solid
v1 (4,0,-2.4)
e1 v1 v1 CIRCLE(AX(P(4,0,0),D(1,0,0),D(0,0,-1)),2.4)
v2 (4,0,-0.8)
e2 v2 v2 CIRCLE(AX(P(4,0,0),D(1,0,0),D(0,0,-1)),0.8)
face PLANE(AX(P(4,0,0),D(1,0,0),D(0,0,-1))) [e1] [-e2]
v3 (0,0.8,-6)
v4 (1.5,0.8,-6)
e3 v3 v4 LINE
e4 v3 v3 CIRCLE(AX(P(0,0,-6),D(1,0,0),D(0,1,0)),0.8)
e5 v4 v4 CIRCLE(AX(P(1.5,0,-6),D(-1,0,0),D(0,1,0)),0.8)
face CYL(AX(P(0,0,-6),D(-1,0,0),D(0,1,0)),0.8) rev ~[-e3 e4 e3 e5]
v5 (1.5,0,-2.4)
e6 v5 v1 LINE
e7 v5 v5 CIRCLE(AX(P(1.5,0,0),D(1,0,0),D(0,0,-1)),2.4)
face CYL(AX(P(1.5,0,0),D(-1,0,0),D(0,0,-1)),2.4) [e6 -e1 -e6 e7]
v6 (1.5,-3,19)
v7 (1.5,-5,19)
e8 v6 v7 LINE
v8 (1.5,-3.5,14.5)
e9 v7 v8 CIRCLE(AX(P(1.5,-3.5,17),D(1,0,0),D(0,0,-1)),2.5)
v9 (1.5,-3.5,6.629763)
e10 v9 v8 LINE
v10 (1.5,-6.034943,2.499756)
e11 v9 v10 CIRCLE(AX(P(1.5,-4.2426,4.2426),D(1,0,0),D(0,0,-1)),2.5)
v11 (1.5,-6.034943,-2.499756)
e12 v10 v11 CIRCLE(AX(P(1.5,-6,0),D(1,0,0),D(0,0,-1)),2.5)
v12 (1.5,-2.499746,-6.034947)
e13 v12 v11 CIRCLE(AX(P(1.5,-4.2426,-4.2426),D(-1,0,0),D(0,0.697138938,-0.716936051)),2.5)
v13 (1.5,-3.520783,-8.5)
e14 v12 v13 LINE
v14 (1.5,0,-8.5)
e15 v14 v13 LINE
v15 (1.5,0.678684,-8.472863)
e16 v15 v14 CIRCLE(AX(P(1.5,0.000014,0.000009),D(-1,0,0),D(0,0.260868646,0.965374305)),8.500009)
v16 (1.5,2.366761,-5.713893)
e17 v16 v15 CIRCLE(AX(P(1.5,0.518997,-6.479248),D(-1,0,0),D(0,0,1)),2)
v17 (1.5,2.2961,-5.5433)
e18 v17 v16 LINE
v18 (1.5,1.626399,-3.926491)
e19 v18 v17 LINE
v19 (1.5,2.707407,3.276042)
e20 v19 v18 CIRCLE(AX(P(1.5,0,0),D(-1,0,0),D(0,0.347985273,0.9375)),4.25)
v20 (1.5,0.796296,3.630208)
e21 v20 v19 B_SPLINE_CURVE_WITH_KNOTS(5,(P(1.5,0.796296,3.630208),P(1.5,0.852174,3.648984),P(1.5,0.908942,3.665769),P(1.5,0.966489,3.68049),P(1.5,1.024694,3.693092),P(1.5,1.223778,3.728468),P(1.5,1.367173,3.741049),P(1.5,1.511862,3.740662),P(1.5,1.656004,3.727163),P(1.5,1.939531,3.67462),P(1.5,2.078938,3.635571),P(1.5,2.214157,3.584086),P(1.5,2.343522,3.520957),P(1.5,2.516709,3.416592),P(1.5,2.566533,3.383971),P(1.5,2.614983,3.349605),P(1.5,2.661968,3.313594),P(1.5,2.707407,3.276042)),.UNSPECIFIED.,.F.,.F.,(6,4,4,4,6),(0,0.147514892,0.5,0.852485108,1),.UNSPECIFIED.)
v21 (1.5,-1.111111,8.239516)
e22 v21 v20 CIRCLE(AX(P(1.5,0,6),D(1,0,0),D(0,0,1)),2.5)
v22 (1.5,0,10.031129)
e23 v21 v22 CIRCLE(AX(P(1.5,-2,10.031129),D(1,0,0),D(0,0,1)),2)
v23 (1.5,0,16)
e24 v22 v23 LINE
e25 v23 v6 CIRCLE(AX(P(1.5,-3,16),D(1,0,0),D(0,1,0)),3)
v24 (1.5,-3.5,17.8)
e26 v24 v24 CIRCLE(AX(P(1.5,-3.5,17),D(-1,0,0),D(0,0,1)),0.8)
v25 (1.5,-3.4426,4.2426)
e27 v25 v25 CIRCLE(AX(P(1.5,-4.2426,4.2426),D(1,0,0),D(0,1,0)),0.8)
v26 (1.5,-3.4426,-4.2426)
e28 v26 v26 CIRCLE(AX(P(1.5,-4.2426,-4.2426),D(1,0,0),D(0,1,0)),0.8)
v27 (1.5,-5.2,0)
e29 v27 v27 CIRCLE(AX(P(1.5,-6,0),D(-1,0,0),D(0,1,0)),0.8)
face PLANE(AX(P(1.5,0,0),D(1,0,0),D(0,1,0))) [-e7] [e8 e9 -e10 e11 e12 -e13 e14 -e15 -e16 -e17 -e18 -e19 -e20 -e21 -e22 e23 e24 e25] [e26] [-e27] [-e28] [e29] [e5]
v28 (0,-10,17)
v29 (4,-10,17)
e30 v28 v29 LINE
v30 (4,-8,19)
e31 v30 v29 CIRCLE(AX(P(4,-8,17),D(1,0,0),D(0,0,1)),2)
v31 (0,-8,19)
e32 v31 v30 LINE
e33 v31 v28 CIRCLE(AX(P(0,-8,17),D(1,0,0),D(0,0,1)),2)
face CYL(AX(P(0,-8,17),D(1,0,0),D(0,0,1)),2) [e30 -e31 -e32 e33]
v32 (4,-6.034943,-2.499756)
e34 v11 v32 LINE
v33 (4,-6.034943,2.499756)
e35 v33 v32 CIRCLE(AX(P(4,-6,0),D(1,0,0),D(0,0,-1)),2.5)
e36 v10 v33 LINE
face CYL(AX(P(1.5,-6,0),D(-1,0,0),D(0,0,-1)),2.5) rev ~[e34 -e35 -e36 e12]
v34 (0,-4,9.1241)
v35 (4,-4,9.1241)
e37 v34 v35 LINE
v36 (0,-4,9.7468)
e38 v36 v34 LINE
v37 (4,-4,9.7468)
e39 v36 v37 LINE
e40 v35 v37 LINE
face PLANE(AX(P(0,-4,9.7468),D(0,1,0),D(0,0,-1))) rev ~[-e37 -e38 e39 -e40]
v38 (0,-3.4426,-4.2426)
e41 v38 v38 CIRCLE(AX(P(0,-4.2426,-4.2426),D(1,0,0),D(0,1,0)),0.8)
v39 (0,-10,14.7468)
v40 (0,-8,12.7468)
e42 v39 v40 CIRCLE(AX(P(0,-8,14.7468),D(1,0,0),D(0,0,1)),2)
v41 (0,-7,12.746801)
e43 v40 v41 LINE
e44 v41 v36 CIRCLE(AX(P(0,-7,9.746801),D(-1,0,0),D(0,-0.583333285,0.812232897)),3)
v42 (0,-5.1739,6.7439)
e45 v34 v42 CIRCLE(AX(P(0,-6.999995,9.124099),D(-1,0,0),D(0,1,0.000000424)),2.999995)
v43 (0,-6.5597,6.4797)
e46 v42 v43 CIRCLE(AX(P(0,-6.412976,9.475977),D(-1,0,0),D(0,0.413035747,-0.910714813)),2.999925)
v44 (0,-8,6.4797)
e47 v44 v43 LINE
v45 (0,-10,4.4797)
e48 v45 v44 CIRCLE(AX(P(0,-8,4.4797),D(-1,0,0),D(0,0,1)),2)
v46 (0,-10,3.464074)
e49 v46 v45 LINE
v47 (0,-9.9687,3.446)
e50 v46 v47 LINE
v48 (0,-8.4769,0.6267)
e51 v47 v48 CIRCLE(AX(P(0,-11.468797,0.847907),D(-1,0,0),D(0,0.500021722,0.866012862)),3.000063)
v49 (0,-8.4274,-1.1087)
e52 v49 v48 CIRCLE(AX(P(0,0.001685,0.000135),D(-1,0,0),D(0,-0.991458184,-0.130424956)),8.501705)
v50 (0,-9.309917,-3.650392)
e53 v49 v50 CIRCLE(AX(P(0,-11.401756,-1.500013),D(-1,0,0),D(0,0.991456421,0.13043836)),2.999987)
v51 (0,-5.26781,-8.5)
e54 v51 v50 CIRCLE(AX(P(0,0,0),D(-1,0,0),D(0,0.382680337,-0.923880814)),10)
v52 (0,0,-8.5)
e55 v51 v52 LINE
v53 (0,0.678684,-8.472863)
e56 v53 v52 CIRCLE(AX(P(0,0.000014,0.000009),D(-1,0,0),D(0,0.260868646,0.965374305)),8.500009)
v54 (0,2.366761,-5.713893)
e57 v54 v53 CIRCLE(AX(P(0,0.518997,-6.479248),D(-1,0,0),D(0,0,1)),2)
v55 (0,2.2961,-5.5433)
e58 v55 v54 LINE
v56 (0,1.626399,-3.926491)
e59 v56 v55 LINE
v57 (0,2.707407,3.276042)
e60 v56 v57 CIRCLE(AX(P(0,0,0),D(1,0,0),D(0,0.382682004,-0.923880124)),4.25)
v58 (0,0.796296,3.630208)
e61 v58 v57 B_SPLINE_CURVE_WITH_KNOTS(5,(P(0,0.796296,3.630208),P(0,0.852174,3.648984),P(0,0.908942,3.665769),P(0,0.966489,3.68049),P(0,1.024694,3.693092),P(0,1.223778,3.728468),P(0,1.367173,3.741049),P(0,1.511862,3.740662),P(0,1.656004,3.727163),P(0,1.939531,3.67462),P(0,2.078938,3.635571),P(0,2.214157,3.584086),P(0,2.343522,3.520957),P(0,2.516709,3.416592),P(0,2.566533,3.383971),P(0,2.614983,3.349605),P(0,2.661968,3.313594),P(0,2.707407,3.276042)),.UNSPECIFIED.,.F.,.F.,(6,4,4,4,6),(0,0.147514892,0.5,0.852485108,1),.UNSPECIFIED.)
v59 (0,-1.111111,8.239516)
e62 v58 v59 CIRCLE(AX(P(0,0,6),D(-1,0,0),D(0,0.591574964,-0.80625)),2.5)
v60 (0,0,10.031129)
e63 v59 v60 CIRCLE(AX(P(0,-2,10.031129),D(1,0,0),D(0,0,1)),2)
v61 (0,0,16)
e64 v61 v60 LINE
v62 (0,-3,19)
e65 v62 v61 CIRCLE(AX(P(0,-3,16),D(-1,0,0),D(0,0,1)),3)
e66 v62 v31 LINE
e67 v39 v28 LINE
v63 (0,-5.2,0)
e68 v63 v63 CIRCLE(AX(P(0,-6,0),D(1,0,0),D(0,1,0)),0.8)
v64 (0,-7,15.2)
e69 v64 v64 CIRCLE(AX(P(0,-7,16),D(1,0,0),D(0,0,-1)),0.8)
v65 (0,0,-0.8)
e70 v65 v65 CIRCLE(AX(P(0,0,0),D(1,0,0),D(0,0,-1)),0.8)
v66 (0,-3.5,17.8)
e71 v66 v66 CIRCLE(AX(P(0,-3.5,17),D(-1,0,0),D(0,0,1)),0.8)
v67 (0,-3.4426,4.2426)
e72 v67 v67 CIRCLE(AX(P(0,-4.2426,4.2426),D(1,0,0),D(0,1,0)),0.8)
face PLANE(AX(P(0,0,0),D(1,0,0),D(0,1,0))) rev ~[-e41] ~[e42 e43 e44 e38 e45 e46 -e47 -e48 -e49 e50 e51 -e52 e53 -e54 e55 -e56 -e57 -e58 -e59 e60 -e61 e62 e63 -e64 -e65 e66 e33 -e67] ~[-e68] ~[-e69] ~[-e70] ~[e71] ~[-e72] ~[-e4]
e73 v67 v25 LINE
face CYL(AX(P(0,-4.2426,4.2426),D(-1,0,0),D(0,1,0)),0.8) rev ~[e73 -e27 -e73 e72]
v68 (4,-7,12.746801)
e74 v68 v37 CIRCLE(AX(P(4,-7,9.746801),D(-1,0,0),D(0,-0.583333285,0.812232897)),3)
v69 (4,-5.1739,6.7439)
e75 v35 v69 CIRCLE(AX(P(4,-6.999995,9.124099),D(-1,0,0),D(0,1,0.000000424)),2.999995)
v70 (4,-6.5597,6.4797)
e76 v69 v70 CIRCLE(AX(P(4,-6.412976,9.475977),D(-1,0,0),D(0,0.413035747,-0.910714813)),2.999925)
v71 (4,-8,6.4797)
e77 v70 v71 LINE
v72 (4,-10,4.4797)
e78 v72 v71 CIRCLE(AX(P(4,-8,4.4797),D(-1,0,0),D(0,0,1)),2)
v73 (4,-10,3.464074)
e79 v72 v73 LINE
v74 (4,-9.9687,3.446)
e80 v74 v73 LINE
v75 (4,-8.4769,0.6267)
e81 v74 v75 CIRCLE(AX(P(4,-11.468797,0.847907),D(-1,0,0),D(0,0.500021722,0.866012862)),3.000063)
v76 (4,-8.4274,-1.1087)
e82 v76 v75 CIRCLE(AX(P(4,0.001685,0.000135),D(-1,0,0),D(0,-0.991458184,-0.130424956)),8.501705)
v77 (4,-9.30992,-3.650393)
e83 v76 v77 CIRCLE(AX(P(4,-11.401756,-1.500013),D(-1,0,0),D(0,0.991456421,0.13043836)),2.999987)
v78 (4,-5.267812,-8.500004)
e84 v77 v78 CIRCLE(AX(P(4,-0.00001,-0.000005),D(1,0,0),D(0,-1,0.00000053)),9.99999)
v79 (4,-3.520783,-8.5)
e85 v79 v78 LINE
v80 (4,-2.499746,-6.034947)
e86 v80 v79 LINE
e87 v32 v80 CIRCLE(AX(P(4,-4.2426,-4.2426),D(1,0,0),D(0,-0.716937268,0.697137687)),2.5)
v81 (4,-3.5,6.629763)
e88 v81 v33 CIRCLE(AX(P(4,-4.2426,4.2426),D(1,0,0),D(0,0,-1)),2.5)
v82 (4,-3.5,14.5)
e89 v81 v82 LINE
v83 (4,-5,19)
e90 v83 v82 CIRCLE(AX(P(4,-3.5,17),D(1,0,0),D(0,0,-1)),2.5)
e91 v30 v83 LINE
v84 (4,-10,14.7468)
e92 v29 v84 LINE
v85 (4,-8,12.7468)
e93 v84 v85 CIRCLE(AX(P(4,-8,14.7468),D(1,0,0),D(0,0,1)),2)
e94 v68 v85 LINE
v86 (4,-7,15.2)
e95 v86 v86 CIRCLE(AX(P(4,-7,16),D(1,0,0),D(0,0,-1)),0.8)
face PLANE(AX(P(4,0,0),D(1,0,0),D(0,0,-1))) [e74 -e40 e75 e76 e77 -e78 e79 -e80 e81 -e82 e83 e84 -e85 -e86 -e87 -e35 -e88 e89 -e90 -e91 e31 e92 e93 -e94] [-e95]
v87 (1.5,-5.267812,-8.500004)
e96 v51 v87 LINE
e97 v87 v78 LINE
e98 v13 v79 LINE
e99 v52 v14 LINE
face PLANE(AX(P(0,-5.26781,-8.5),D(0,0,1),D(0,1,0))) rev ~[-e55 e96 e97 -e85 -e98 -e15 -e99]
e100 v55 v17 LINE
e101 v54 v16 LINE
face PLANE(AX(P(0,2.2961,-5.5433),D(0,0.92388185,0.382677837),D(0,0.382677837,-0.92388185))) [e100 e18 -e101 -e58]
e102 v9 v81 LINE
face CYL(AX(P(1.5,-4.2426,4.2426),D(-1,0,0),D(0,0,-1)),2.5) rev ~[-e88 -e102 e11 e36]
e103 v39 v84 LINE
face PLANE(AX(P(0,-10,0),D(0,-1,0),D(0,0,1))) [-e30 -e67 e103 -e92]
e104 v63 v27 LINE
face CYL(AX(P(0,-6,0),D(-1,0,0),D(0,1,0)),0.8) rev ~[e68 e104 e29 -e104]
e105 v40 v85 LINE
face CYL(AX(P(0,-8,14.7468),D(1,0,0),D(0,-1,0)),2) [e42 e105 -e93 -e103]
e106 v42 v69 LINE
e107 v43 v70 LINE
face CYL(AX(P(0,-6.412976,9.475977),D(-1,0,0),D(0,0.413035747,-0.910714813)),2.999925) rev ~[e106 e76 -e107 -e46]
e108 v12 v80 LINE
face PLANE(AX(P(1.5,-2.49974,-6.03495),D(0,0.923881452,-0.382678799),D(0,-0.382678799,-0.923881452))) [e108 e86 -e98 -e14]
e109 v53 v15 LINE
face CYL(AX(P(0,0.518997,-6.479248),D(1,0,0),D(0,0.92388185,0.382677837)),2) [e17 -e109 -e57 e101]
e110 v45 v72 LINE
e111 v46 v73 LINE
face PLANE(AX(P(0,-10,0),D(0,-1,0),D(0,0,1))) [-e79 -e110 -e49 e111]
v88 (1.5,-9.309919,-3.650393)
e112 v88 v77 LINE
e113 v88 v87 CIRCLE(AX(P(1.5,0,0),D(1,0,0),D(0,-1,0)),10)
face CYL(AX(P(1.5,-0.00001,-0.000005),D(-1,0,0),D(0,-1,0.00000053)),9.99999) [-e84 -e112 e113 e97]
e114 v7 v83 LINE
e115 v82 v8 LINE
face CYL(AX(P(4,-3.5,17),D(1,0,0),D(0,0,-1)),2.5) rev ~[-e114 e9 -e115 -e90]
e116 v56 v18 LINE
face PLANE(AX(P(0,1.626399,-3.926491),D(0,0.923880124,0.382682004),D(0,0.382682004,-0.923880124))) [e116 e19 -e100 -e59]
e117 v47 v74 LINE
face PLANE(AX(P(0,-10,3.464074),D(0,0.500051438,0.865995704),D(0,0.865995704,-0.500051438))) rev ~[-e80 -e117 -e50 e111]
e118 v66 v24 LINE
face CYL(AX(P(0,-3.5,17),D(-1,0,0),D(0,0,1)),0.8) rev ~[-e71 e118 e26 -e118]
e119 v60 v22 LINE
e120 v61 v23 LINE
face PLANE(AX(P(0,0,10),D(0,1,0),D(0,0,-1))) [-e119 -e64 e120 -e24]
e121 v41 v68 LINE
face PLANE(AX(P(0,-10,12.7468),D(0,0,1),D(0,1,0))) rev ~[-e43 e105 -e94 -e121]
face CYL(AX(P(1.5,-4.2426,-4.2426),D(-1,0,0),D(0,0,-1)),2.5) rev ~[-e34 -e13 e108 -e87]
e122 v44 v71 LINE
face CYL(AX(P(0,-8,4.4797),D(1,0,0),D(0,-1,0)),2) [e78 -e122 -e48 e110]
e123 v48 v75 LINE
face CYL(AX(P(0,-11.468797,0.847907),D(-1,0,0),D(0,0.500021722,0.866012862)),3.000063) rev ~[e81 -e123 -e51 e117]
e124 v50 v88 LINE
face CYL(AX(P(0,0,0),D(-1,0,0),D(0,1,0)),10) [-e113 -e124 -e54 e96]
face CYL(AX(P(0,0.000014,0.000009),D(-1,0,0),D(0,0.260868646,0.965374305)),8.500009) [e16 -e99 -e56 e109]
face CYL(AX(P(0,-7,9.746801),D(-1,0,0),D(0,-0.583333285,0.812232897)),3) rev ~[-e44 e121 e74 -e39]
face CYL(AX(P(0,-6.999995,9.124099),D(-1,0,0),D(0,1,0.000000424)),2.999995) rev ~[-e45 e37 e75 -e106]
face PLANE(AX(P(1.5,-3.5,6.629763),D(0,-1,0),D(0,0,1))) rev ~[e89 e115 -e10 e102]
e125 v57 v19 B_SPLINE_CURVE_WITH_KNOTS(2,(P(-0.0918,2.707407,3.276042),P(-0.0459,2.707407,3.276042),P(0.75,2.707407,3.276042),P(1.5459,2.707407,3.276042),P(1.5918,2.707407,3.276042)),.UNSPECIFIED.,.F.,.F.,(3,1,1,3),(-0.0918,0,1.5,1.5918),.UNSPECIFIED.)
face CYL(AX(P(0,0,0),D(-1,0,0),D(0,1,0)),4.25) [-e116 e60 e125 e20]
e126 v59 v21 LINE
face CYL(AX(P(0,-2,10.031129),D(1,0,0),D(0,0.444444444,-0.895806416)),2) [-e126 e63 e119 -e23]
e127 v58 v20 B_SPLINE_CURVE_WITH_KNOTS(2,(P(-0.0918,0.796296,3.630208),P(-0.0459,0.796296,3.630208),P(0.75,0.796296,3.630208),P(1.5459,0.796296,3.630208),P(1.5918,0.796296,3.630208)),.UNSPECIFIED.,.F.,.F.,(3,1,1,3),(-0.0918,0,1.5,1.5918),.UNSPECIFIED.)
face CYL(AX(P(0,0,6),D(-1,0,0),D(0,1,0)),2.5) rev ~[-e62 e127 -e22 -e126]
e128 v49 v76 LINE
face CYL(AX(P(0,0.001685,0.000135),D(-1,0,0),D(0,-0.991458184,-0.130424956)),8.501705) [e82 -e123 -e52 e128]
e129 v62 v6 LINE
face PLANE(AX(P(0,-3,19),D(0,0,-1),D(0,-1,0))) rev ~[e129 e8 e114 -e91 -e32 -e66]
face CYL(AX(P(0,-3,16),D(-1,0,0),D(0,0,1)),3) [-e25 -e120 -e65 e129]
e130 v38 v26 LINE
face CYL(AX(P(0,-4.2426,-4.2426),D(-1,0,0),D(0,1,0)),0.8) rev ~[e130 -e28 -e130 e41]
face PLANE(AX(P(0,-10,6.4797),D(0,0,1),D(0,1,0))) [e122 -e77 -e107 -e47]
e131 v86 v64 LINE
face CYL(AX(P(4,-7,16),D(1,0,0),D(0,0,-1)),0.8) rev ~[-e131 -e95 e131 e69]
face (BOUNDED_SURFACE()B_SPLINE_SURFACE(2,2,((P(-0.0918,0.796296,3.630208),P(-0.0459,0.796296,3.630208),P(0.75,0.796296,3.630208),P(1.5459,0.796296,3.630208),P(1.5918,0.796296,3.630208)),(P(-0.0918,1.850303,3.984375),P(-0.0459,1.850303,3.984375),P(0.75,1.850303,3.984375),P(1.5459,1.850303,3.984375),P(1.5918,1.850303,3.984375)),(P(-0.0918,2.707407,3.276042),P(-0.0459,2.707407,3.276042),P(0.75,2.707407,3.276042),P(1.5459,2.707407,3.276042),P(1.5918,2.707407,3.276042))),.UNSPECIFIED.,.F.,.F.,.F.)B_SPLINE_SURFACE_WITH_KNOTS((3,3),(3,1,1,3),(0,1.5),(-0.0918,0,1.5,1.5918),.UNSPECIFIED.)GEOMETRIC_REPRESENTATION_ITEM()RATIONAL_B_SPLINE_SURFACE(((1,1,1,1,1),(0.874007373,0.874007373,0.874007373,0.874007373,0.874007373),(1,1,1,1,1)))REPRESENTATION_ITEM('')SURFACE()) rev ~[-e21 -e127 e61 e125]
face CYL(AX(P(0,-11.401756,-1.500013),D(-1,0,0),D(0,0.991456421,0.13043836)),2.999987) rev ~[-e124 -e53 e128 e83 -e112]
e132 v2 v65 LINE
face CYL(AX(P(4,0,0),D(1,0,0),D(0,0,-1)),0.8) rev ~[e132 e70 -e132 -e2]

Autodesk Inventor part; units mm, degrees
ref_plane "YZ Plane" through (0, 0, 0) normal (1, 0, 0) x (0, 1, 0)
ref_plane "XZ Plane" through (0, 0, 0) normal (0, 1, 0) x (-1, 0, 0)
ref_plane "XY Plane" through (0, 0, 0) normal (0, 0, 1) x (1, 0, 0)
sketch "スケッチ1" plane through (0, 0, 0) normal (1, 0, 0) x (0, 1, 0)
  circle A0 centre (0, 0) radius 4.25
  circle A1 centre (0, 0) radius 6 construction
  circle A2 centre (6, 0) radius 0.8
  line L0 (-14, 0) -> (14, 0) projected
  circle A3 centre (4.2426, 4.2426) radius 0.8
  circle A4 centre (0, 6) radius 0.8
  circle A5 centre (-4.2426, 4.2426) radius 0.8
  circle A6 centre (-6, 0) radius 0.8
  circle A7 centre (-4.2426, -4.2426) radius 0.8
  circle A8 centre (0, -6) radius 0.8
  circle A9 centre (4.2426, -4.2426) radius 0.8
  circle A10 centre (0, 0) radius 2.4
  line L1 (0, 0) -> (0, 6)
  line L2 (0, 0) -> (2.2961, -5.5433)
  circle A11 centre (0, 0) radius 10
  line L3 (2.2961, -5.5433) -> (3.8268, -9.2388)
  line L4 (0, -9.2388) -> (-10, -9.2388)
  line L5 (-10, -9.2388) -> (-10, 20)
  line L6 (-10, 20) -> (0, 20)
  line L7 (0, 20) -> (0, -9.2388)
  line L8 (0, -6) -> (4.2426, -4.2426) construction
  line L9 (0, -9.2388) -> (3.8268, -9.2388)
  circle A12 centre (0, 6) radius 2.5
  point P0 (0, 5.2)
  point P1 (0, 6.8)
  point P2 (-10, 0)
  point P3 (2.1213, -5.1213)
  point P4 (0, 2.4)
  point P5 (0.9184, -2.2173)
  point P6 (1.4789, 3.9844)
  point P7 (0, 8.5)
  point P8 (1.6264, -3.9265)
  dimension "d0" = 8.5
  dimension "d1" = 12
  dimension "d2" = 1.6
  dimension "d5" = 360
  dimension "d7" = 4.8
  dimension "d8" = 4
  dimension "d21" = 5
  dimension "d23" = 20
extrude "押し出し1" add sketch "スケッチ1" along normal blind 1.5 contours L0 A10 L1 A12 A0 | A0 L2 A10 L0 | L2 L3 L9 L7 A8 A0 | A0 L7 A10 L2 | A10 L2 L0 | L0 L1 A10 | L1 A10 L0 A0 A12 | L7 A8 L4 A11 L0 A6 A0 | A0 L0 A10 L7 | A10 L7 L2 | L7 A10 L0 | L0 A10 L1 | A0 L0 A6 A11 L7 A12 | A11 L4 L9 | A11 L5 L6 L7
sketch "スケッチ3" plane through (1.5, 0, 0) normal (1, 0, 0) x (0, 0, -1)
  circle A0 centre (0, 0) radius 2.5 construction
  line L0 (0, -2.5) -> (-20, -2.5) construction
  line L1 (-20, -2.5) -> (0, -2.5)
  line L2 (0, -2.5) -> (0, -3.5)
  line L3 (0, -3.5) -> (-20, -3.5)
  line L4 (-20, -3.5) -> (-20, -2.5)
  circle A1 centre (0, 0) radius 3.5
  line L5 (-20, 0) -> (-20, -10) projected
  line L6 (-8.5, 0) -> (-20, 0) projected
  line L7 (-20, 0) -> (-20, -10) projected
  line L8 (-20, -10) -> (0, -10) projected
  arc A2 (0, -10) -> (9.2388, 3.8268) centre (0, 0) ccw projected
  line L9 (9.2388, 3.8268) -> (3.9265, 1.6264) projected
  circle A3 centre (4.2426, -4.2426) radius 0.8 projected
  circle A4 centre (-4.2426, -4.2426) radius 0.8 projected
  circle A5 centre (0, -6) radius 0.8 projected
  circle A6 centre (-4.2426, -4.2426) radius 2.5
  circle A7 centre (0, -6) radius 2.5
  circle A8 centre (4.2426, -4.2426) radius 2.5
  circle A9 centre (6, 0) radius 0.8 projected
  circle A10 centre (6, 0) radius 2.5
  arc A11 (-8.5, 0) -> (-3.9844, 1.4789) centre (-6, 0) ccw projected
  arc A12 (3.9265, 1.6264) -> (-3.9844, 1.4789) centre (0, 0) ccw projected
  circle A13 centre (0, 0) radius 2.4
  line L10 (3.2336, -1.3394) -> (9.2388, -3.8268)
  line L11 (6, 0) -> (4.2426, -4.2426) construction
  point P0 (6.0349, 2.4998)
  point P1 (6.0349, -2.4998)
  point P2 (2.4998, -6.0349)
  point P3 (-2.4998, -6.0349)
  point P4 (-6.6298, -3.5)
  point P5 (5.1213, -2.1213)
  point P6 (6.0349, -2.4998)
  dimension "d13" = 5
  dimension "d14" = 1
  dimension "d15" = 5
  dimension "d16" = 5
  dimension "d17" = 5
  dimension "d18" = 5
  dimension "d22" = 4.8
extrude "押し出し2" add sketch "スケッチ3" along normal blind 2.5 contours L3 A6 A7 A8 L10 A2 L8 L5 | A13
sketch "スケッチ4" plane through (0, 0, 0) normal (-1, 0, 0) x (0, 0, 1)
  line L0 (3.7223, -10.4472) -> (3.446, -9.9687) projected
  arc A0 (3.446, -9.9687) -> (0.6267, -8.4769) centre (0.848, -11.4687) ccw projected
  arc A1 (-1.1087, -8.4274) -> (0.6267, -8.4769) centre (0, 0) ccw projected
  arc A2 (-1.1087, -8.4274) -> (-4.5, -11.4018) centre (-1.5, -11.4018) ccw projected
  line L1 (-4.5, -11.4018) -> (-4.5, -11.9059) projected
  arc A3 (-4.5, -11.9059) -> (-1.875, -14.8824) centre (-1.5, -11.9059) ccw projected
  arc A4 (-1.875, -14.8824) -> (1.4053, -14.934) centre (0, 0) ccw projected
  arc A5 (1.4053, -14.934) -> (3.7223, -10.4472) centre (1.1242, -11.9472) ccw projected
  arc A6 (-8.5, -16) -> (-5.5, -19) centre (-5.5, -16) ccw projected
  line L2 (-8.5, -16) -> (-8.5, 0) projected
  arc A7 (8.2057, 2.2174) -> (-8.5, 0) centre (0, 0) ccw projected
  arc A8 (8.2057, 2.2174) -> (11.1018, 0) centre (11.1018, 3) ccw projected
  line L3 (11.1018, 0) -> (16, 0) projected
  arc A9 (19, -3) -> (16, 0) centre (16, -3) ccw projected
  line L4 (19, -3) -> (19, -16) projected
  arc A10 (16, -19) -> (19, -16) centre (16, -16) ccw projected
  line L5 (16, -19) -> (-5.5, -19) projected
  circle A11 centre (-6, 0) radius 1 projected
  circle A12 centre (-4.2426, 4.2426) radius 1 projected
  circle A13 centre (0, 6) radius 1 projected
  circle A14 centre (4.2426, 4.2426) radius 1 projected
  circle A15 centre (13.8033, -13.8033) radius 0.8 projected
  circle A16 centre (-2.5, -17) radius 0.8 projected
  circle A17 centre (17, -17) radius 0.8 projected
  circle A18 centre (6, 0) radius 1 projected
  circle A19 centre (4.2426, -4.2426) radius 1 projected
  circle A20 centre (-4.2426, -4.2426) radius 1 projected
  circle A21 centre (0, -6) radius 1 projected
  circle A22 centre (0, 0) radius 4.25 projected
  circle A23 centre (17, -3.5) radius 0.8 projected
  arc A24 (12.1835, -8.75) -> (9.7468, -4) centre (9.7468, -7) ccw projected
  line L6 (9.7468, -4) -> (9.1241, -4) projected
  arc A25 (9.1241, -4) -> (6.7439, -5.1739) centre (9.1241, -7) ccw projected
  arc A26 (6.7439, -5.1739) -> (6.878, -7.913) centre (9.4761, -6.413) ccw projected
  line L7 (6.878, -7.913) -> (7.1869, -8.448) projected
  arc A27 (7.1869, -8.448) -> (12.1835, -8.75) centre (9.785, -6.948) ccw projected
  circle A28 centre (-6, 0) radius 0.8 projected
  circle A29 centre (-4.2426, -4.2426) radius 0.8 projected
  circle A30 centre (4.2426, -4.2426) radius 0.8 projected
  circle A31 centre (0, -6) radius 0.8 projected
  arc A32 (3.9844, 1.4789) -> (8.5, 0) centre (6, 0) ccw projected
  arc A33 (3.9844, 1.4789) -> (-3.9265, 1.6264) centre (0, 0) ccw projected
  line L8 (-9.2388, 3.8268) -> (-3.9265, 1.6264) projected
  arc A34 (-9.2388, 3.8268) -> (0, -10) centre (0, 0) ccw projected
  line L9 (20, -10) -> (0, -10) projected
  line L10 (20, 0) -> (20, -10) projected
  line L11 (8.5, 0) -> (20, 0) projected
  line L12 (12.7468, -10) -> (12.7468, -6.471)
  line L13 (6.4797, -10) -> (6.4797, -6.5597)
  point P0 (-3.6504, -9.3099)
  point P1 (3.4641, -10)
  point P2 (19, -10)
  point P3 (-8.5, -5.2678)
  point P4 (-7.853, 3.2528)
  point P5 (12.7468, -7)
extrude "押し出し3" cut sketch "スケッチ4" against normal through all contours L9 A34 A2 A1 A0 L0 | L13 A26 L7 A27 A24 L12 L9 | A26 A25 L6 A24 A27 L7 | L4 A9 L11 L10 L9 | A34 L8 A7 L2 | A23
sketch "スケッチ5" plane through (4, 0, 0) normal (1, 0, 0) x (0, 0, -1)
  circle A0 centre (-17, -3.5) radius 2.5
  arc A1 (-16.2, -3.5) -> (-17.8, -3.5) centre (-17, -3.5) ccw projected
  point P0 (0, 0)
  dimension "d26" = 5
extrude "押し出し4" cut sketch "スケッチ5" against normal up to surface (2.5 mm away)
sketch "スケッチ6" plane through (4, 0, 0) normal (1, 0, 0) x (0, 0, -1)
  circle A0 centre (-16, -7) radius 0.8 projected
  circle A1 centre (0, 0) radius 0.8 projected
  point P0 (0, 0)
extrude "押し出し5" cut sketch "スケッチ6" against normal through all
fillet "フィレット1" radius 2 6 edges at (2, -10, 19) (2, -10, 12.7468) (2, -10, 6.4797) (0.75, 3.2528, -7.853) (0.75, 0, 8.5) (0.75, 1.4789, 3.9844)
properties part number "toe_springjoint_bace_under_left"
